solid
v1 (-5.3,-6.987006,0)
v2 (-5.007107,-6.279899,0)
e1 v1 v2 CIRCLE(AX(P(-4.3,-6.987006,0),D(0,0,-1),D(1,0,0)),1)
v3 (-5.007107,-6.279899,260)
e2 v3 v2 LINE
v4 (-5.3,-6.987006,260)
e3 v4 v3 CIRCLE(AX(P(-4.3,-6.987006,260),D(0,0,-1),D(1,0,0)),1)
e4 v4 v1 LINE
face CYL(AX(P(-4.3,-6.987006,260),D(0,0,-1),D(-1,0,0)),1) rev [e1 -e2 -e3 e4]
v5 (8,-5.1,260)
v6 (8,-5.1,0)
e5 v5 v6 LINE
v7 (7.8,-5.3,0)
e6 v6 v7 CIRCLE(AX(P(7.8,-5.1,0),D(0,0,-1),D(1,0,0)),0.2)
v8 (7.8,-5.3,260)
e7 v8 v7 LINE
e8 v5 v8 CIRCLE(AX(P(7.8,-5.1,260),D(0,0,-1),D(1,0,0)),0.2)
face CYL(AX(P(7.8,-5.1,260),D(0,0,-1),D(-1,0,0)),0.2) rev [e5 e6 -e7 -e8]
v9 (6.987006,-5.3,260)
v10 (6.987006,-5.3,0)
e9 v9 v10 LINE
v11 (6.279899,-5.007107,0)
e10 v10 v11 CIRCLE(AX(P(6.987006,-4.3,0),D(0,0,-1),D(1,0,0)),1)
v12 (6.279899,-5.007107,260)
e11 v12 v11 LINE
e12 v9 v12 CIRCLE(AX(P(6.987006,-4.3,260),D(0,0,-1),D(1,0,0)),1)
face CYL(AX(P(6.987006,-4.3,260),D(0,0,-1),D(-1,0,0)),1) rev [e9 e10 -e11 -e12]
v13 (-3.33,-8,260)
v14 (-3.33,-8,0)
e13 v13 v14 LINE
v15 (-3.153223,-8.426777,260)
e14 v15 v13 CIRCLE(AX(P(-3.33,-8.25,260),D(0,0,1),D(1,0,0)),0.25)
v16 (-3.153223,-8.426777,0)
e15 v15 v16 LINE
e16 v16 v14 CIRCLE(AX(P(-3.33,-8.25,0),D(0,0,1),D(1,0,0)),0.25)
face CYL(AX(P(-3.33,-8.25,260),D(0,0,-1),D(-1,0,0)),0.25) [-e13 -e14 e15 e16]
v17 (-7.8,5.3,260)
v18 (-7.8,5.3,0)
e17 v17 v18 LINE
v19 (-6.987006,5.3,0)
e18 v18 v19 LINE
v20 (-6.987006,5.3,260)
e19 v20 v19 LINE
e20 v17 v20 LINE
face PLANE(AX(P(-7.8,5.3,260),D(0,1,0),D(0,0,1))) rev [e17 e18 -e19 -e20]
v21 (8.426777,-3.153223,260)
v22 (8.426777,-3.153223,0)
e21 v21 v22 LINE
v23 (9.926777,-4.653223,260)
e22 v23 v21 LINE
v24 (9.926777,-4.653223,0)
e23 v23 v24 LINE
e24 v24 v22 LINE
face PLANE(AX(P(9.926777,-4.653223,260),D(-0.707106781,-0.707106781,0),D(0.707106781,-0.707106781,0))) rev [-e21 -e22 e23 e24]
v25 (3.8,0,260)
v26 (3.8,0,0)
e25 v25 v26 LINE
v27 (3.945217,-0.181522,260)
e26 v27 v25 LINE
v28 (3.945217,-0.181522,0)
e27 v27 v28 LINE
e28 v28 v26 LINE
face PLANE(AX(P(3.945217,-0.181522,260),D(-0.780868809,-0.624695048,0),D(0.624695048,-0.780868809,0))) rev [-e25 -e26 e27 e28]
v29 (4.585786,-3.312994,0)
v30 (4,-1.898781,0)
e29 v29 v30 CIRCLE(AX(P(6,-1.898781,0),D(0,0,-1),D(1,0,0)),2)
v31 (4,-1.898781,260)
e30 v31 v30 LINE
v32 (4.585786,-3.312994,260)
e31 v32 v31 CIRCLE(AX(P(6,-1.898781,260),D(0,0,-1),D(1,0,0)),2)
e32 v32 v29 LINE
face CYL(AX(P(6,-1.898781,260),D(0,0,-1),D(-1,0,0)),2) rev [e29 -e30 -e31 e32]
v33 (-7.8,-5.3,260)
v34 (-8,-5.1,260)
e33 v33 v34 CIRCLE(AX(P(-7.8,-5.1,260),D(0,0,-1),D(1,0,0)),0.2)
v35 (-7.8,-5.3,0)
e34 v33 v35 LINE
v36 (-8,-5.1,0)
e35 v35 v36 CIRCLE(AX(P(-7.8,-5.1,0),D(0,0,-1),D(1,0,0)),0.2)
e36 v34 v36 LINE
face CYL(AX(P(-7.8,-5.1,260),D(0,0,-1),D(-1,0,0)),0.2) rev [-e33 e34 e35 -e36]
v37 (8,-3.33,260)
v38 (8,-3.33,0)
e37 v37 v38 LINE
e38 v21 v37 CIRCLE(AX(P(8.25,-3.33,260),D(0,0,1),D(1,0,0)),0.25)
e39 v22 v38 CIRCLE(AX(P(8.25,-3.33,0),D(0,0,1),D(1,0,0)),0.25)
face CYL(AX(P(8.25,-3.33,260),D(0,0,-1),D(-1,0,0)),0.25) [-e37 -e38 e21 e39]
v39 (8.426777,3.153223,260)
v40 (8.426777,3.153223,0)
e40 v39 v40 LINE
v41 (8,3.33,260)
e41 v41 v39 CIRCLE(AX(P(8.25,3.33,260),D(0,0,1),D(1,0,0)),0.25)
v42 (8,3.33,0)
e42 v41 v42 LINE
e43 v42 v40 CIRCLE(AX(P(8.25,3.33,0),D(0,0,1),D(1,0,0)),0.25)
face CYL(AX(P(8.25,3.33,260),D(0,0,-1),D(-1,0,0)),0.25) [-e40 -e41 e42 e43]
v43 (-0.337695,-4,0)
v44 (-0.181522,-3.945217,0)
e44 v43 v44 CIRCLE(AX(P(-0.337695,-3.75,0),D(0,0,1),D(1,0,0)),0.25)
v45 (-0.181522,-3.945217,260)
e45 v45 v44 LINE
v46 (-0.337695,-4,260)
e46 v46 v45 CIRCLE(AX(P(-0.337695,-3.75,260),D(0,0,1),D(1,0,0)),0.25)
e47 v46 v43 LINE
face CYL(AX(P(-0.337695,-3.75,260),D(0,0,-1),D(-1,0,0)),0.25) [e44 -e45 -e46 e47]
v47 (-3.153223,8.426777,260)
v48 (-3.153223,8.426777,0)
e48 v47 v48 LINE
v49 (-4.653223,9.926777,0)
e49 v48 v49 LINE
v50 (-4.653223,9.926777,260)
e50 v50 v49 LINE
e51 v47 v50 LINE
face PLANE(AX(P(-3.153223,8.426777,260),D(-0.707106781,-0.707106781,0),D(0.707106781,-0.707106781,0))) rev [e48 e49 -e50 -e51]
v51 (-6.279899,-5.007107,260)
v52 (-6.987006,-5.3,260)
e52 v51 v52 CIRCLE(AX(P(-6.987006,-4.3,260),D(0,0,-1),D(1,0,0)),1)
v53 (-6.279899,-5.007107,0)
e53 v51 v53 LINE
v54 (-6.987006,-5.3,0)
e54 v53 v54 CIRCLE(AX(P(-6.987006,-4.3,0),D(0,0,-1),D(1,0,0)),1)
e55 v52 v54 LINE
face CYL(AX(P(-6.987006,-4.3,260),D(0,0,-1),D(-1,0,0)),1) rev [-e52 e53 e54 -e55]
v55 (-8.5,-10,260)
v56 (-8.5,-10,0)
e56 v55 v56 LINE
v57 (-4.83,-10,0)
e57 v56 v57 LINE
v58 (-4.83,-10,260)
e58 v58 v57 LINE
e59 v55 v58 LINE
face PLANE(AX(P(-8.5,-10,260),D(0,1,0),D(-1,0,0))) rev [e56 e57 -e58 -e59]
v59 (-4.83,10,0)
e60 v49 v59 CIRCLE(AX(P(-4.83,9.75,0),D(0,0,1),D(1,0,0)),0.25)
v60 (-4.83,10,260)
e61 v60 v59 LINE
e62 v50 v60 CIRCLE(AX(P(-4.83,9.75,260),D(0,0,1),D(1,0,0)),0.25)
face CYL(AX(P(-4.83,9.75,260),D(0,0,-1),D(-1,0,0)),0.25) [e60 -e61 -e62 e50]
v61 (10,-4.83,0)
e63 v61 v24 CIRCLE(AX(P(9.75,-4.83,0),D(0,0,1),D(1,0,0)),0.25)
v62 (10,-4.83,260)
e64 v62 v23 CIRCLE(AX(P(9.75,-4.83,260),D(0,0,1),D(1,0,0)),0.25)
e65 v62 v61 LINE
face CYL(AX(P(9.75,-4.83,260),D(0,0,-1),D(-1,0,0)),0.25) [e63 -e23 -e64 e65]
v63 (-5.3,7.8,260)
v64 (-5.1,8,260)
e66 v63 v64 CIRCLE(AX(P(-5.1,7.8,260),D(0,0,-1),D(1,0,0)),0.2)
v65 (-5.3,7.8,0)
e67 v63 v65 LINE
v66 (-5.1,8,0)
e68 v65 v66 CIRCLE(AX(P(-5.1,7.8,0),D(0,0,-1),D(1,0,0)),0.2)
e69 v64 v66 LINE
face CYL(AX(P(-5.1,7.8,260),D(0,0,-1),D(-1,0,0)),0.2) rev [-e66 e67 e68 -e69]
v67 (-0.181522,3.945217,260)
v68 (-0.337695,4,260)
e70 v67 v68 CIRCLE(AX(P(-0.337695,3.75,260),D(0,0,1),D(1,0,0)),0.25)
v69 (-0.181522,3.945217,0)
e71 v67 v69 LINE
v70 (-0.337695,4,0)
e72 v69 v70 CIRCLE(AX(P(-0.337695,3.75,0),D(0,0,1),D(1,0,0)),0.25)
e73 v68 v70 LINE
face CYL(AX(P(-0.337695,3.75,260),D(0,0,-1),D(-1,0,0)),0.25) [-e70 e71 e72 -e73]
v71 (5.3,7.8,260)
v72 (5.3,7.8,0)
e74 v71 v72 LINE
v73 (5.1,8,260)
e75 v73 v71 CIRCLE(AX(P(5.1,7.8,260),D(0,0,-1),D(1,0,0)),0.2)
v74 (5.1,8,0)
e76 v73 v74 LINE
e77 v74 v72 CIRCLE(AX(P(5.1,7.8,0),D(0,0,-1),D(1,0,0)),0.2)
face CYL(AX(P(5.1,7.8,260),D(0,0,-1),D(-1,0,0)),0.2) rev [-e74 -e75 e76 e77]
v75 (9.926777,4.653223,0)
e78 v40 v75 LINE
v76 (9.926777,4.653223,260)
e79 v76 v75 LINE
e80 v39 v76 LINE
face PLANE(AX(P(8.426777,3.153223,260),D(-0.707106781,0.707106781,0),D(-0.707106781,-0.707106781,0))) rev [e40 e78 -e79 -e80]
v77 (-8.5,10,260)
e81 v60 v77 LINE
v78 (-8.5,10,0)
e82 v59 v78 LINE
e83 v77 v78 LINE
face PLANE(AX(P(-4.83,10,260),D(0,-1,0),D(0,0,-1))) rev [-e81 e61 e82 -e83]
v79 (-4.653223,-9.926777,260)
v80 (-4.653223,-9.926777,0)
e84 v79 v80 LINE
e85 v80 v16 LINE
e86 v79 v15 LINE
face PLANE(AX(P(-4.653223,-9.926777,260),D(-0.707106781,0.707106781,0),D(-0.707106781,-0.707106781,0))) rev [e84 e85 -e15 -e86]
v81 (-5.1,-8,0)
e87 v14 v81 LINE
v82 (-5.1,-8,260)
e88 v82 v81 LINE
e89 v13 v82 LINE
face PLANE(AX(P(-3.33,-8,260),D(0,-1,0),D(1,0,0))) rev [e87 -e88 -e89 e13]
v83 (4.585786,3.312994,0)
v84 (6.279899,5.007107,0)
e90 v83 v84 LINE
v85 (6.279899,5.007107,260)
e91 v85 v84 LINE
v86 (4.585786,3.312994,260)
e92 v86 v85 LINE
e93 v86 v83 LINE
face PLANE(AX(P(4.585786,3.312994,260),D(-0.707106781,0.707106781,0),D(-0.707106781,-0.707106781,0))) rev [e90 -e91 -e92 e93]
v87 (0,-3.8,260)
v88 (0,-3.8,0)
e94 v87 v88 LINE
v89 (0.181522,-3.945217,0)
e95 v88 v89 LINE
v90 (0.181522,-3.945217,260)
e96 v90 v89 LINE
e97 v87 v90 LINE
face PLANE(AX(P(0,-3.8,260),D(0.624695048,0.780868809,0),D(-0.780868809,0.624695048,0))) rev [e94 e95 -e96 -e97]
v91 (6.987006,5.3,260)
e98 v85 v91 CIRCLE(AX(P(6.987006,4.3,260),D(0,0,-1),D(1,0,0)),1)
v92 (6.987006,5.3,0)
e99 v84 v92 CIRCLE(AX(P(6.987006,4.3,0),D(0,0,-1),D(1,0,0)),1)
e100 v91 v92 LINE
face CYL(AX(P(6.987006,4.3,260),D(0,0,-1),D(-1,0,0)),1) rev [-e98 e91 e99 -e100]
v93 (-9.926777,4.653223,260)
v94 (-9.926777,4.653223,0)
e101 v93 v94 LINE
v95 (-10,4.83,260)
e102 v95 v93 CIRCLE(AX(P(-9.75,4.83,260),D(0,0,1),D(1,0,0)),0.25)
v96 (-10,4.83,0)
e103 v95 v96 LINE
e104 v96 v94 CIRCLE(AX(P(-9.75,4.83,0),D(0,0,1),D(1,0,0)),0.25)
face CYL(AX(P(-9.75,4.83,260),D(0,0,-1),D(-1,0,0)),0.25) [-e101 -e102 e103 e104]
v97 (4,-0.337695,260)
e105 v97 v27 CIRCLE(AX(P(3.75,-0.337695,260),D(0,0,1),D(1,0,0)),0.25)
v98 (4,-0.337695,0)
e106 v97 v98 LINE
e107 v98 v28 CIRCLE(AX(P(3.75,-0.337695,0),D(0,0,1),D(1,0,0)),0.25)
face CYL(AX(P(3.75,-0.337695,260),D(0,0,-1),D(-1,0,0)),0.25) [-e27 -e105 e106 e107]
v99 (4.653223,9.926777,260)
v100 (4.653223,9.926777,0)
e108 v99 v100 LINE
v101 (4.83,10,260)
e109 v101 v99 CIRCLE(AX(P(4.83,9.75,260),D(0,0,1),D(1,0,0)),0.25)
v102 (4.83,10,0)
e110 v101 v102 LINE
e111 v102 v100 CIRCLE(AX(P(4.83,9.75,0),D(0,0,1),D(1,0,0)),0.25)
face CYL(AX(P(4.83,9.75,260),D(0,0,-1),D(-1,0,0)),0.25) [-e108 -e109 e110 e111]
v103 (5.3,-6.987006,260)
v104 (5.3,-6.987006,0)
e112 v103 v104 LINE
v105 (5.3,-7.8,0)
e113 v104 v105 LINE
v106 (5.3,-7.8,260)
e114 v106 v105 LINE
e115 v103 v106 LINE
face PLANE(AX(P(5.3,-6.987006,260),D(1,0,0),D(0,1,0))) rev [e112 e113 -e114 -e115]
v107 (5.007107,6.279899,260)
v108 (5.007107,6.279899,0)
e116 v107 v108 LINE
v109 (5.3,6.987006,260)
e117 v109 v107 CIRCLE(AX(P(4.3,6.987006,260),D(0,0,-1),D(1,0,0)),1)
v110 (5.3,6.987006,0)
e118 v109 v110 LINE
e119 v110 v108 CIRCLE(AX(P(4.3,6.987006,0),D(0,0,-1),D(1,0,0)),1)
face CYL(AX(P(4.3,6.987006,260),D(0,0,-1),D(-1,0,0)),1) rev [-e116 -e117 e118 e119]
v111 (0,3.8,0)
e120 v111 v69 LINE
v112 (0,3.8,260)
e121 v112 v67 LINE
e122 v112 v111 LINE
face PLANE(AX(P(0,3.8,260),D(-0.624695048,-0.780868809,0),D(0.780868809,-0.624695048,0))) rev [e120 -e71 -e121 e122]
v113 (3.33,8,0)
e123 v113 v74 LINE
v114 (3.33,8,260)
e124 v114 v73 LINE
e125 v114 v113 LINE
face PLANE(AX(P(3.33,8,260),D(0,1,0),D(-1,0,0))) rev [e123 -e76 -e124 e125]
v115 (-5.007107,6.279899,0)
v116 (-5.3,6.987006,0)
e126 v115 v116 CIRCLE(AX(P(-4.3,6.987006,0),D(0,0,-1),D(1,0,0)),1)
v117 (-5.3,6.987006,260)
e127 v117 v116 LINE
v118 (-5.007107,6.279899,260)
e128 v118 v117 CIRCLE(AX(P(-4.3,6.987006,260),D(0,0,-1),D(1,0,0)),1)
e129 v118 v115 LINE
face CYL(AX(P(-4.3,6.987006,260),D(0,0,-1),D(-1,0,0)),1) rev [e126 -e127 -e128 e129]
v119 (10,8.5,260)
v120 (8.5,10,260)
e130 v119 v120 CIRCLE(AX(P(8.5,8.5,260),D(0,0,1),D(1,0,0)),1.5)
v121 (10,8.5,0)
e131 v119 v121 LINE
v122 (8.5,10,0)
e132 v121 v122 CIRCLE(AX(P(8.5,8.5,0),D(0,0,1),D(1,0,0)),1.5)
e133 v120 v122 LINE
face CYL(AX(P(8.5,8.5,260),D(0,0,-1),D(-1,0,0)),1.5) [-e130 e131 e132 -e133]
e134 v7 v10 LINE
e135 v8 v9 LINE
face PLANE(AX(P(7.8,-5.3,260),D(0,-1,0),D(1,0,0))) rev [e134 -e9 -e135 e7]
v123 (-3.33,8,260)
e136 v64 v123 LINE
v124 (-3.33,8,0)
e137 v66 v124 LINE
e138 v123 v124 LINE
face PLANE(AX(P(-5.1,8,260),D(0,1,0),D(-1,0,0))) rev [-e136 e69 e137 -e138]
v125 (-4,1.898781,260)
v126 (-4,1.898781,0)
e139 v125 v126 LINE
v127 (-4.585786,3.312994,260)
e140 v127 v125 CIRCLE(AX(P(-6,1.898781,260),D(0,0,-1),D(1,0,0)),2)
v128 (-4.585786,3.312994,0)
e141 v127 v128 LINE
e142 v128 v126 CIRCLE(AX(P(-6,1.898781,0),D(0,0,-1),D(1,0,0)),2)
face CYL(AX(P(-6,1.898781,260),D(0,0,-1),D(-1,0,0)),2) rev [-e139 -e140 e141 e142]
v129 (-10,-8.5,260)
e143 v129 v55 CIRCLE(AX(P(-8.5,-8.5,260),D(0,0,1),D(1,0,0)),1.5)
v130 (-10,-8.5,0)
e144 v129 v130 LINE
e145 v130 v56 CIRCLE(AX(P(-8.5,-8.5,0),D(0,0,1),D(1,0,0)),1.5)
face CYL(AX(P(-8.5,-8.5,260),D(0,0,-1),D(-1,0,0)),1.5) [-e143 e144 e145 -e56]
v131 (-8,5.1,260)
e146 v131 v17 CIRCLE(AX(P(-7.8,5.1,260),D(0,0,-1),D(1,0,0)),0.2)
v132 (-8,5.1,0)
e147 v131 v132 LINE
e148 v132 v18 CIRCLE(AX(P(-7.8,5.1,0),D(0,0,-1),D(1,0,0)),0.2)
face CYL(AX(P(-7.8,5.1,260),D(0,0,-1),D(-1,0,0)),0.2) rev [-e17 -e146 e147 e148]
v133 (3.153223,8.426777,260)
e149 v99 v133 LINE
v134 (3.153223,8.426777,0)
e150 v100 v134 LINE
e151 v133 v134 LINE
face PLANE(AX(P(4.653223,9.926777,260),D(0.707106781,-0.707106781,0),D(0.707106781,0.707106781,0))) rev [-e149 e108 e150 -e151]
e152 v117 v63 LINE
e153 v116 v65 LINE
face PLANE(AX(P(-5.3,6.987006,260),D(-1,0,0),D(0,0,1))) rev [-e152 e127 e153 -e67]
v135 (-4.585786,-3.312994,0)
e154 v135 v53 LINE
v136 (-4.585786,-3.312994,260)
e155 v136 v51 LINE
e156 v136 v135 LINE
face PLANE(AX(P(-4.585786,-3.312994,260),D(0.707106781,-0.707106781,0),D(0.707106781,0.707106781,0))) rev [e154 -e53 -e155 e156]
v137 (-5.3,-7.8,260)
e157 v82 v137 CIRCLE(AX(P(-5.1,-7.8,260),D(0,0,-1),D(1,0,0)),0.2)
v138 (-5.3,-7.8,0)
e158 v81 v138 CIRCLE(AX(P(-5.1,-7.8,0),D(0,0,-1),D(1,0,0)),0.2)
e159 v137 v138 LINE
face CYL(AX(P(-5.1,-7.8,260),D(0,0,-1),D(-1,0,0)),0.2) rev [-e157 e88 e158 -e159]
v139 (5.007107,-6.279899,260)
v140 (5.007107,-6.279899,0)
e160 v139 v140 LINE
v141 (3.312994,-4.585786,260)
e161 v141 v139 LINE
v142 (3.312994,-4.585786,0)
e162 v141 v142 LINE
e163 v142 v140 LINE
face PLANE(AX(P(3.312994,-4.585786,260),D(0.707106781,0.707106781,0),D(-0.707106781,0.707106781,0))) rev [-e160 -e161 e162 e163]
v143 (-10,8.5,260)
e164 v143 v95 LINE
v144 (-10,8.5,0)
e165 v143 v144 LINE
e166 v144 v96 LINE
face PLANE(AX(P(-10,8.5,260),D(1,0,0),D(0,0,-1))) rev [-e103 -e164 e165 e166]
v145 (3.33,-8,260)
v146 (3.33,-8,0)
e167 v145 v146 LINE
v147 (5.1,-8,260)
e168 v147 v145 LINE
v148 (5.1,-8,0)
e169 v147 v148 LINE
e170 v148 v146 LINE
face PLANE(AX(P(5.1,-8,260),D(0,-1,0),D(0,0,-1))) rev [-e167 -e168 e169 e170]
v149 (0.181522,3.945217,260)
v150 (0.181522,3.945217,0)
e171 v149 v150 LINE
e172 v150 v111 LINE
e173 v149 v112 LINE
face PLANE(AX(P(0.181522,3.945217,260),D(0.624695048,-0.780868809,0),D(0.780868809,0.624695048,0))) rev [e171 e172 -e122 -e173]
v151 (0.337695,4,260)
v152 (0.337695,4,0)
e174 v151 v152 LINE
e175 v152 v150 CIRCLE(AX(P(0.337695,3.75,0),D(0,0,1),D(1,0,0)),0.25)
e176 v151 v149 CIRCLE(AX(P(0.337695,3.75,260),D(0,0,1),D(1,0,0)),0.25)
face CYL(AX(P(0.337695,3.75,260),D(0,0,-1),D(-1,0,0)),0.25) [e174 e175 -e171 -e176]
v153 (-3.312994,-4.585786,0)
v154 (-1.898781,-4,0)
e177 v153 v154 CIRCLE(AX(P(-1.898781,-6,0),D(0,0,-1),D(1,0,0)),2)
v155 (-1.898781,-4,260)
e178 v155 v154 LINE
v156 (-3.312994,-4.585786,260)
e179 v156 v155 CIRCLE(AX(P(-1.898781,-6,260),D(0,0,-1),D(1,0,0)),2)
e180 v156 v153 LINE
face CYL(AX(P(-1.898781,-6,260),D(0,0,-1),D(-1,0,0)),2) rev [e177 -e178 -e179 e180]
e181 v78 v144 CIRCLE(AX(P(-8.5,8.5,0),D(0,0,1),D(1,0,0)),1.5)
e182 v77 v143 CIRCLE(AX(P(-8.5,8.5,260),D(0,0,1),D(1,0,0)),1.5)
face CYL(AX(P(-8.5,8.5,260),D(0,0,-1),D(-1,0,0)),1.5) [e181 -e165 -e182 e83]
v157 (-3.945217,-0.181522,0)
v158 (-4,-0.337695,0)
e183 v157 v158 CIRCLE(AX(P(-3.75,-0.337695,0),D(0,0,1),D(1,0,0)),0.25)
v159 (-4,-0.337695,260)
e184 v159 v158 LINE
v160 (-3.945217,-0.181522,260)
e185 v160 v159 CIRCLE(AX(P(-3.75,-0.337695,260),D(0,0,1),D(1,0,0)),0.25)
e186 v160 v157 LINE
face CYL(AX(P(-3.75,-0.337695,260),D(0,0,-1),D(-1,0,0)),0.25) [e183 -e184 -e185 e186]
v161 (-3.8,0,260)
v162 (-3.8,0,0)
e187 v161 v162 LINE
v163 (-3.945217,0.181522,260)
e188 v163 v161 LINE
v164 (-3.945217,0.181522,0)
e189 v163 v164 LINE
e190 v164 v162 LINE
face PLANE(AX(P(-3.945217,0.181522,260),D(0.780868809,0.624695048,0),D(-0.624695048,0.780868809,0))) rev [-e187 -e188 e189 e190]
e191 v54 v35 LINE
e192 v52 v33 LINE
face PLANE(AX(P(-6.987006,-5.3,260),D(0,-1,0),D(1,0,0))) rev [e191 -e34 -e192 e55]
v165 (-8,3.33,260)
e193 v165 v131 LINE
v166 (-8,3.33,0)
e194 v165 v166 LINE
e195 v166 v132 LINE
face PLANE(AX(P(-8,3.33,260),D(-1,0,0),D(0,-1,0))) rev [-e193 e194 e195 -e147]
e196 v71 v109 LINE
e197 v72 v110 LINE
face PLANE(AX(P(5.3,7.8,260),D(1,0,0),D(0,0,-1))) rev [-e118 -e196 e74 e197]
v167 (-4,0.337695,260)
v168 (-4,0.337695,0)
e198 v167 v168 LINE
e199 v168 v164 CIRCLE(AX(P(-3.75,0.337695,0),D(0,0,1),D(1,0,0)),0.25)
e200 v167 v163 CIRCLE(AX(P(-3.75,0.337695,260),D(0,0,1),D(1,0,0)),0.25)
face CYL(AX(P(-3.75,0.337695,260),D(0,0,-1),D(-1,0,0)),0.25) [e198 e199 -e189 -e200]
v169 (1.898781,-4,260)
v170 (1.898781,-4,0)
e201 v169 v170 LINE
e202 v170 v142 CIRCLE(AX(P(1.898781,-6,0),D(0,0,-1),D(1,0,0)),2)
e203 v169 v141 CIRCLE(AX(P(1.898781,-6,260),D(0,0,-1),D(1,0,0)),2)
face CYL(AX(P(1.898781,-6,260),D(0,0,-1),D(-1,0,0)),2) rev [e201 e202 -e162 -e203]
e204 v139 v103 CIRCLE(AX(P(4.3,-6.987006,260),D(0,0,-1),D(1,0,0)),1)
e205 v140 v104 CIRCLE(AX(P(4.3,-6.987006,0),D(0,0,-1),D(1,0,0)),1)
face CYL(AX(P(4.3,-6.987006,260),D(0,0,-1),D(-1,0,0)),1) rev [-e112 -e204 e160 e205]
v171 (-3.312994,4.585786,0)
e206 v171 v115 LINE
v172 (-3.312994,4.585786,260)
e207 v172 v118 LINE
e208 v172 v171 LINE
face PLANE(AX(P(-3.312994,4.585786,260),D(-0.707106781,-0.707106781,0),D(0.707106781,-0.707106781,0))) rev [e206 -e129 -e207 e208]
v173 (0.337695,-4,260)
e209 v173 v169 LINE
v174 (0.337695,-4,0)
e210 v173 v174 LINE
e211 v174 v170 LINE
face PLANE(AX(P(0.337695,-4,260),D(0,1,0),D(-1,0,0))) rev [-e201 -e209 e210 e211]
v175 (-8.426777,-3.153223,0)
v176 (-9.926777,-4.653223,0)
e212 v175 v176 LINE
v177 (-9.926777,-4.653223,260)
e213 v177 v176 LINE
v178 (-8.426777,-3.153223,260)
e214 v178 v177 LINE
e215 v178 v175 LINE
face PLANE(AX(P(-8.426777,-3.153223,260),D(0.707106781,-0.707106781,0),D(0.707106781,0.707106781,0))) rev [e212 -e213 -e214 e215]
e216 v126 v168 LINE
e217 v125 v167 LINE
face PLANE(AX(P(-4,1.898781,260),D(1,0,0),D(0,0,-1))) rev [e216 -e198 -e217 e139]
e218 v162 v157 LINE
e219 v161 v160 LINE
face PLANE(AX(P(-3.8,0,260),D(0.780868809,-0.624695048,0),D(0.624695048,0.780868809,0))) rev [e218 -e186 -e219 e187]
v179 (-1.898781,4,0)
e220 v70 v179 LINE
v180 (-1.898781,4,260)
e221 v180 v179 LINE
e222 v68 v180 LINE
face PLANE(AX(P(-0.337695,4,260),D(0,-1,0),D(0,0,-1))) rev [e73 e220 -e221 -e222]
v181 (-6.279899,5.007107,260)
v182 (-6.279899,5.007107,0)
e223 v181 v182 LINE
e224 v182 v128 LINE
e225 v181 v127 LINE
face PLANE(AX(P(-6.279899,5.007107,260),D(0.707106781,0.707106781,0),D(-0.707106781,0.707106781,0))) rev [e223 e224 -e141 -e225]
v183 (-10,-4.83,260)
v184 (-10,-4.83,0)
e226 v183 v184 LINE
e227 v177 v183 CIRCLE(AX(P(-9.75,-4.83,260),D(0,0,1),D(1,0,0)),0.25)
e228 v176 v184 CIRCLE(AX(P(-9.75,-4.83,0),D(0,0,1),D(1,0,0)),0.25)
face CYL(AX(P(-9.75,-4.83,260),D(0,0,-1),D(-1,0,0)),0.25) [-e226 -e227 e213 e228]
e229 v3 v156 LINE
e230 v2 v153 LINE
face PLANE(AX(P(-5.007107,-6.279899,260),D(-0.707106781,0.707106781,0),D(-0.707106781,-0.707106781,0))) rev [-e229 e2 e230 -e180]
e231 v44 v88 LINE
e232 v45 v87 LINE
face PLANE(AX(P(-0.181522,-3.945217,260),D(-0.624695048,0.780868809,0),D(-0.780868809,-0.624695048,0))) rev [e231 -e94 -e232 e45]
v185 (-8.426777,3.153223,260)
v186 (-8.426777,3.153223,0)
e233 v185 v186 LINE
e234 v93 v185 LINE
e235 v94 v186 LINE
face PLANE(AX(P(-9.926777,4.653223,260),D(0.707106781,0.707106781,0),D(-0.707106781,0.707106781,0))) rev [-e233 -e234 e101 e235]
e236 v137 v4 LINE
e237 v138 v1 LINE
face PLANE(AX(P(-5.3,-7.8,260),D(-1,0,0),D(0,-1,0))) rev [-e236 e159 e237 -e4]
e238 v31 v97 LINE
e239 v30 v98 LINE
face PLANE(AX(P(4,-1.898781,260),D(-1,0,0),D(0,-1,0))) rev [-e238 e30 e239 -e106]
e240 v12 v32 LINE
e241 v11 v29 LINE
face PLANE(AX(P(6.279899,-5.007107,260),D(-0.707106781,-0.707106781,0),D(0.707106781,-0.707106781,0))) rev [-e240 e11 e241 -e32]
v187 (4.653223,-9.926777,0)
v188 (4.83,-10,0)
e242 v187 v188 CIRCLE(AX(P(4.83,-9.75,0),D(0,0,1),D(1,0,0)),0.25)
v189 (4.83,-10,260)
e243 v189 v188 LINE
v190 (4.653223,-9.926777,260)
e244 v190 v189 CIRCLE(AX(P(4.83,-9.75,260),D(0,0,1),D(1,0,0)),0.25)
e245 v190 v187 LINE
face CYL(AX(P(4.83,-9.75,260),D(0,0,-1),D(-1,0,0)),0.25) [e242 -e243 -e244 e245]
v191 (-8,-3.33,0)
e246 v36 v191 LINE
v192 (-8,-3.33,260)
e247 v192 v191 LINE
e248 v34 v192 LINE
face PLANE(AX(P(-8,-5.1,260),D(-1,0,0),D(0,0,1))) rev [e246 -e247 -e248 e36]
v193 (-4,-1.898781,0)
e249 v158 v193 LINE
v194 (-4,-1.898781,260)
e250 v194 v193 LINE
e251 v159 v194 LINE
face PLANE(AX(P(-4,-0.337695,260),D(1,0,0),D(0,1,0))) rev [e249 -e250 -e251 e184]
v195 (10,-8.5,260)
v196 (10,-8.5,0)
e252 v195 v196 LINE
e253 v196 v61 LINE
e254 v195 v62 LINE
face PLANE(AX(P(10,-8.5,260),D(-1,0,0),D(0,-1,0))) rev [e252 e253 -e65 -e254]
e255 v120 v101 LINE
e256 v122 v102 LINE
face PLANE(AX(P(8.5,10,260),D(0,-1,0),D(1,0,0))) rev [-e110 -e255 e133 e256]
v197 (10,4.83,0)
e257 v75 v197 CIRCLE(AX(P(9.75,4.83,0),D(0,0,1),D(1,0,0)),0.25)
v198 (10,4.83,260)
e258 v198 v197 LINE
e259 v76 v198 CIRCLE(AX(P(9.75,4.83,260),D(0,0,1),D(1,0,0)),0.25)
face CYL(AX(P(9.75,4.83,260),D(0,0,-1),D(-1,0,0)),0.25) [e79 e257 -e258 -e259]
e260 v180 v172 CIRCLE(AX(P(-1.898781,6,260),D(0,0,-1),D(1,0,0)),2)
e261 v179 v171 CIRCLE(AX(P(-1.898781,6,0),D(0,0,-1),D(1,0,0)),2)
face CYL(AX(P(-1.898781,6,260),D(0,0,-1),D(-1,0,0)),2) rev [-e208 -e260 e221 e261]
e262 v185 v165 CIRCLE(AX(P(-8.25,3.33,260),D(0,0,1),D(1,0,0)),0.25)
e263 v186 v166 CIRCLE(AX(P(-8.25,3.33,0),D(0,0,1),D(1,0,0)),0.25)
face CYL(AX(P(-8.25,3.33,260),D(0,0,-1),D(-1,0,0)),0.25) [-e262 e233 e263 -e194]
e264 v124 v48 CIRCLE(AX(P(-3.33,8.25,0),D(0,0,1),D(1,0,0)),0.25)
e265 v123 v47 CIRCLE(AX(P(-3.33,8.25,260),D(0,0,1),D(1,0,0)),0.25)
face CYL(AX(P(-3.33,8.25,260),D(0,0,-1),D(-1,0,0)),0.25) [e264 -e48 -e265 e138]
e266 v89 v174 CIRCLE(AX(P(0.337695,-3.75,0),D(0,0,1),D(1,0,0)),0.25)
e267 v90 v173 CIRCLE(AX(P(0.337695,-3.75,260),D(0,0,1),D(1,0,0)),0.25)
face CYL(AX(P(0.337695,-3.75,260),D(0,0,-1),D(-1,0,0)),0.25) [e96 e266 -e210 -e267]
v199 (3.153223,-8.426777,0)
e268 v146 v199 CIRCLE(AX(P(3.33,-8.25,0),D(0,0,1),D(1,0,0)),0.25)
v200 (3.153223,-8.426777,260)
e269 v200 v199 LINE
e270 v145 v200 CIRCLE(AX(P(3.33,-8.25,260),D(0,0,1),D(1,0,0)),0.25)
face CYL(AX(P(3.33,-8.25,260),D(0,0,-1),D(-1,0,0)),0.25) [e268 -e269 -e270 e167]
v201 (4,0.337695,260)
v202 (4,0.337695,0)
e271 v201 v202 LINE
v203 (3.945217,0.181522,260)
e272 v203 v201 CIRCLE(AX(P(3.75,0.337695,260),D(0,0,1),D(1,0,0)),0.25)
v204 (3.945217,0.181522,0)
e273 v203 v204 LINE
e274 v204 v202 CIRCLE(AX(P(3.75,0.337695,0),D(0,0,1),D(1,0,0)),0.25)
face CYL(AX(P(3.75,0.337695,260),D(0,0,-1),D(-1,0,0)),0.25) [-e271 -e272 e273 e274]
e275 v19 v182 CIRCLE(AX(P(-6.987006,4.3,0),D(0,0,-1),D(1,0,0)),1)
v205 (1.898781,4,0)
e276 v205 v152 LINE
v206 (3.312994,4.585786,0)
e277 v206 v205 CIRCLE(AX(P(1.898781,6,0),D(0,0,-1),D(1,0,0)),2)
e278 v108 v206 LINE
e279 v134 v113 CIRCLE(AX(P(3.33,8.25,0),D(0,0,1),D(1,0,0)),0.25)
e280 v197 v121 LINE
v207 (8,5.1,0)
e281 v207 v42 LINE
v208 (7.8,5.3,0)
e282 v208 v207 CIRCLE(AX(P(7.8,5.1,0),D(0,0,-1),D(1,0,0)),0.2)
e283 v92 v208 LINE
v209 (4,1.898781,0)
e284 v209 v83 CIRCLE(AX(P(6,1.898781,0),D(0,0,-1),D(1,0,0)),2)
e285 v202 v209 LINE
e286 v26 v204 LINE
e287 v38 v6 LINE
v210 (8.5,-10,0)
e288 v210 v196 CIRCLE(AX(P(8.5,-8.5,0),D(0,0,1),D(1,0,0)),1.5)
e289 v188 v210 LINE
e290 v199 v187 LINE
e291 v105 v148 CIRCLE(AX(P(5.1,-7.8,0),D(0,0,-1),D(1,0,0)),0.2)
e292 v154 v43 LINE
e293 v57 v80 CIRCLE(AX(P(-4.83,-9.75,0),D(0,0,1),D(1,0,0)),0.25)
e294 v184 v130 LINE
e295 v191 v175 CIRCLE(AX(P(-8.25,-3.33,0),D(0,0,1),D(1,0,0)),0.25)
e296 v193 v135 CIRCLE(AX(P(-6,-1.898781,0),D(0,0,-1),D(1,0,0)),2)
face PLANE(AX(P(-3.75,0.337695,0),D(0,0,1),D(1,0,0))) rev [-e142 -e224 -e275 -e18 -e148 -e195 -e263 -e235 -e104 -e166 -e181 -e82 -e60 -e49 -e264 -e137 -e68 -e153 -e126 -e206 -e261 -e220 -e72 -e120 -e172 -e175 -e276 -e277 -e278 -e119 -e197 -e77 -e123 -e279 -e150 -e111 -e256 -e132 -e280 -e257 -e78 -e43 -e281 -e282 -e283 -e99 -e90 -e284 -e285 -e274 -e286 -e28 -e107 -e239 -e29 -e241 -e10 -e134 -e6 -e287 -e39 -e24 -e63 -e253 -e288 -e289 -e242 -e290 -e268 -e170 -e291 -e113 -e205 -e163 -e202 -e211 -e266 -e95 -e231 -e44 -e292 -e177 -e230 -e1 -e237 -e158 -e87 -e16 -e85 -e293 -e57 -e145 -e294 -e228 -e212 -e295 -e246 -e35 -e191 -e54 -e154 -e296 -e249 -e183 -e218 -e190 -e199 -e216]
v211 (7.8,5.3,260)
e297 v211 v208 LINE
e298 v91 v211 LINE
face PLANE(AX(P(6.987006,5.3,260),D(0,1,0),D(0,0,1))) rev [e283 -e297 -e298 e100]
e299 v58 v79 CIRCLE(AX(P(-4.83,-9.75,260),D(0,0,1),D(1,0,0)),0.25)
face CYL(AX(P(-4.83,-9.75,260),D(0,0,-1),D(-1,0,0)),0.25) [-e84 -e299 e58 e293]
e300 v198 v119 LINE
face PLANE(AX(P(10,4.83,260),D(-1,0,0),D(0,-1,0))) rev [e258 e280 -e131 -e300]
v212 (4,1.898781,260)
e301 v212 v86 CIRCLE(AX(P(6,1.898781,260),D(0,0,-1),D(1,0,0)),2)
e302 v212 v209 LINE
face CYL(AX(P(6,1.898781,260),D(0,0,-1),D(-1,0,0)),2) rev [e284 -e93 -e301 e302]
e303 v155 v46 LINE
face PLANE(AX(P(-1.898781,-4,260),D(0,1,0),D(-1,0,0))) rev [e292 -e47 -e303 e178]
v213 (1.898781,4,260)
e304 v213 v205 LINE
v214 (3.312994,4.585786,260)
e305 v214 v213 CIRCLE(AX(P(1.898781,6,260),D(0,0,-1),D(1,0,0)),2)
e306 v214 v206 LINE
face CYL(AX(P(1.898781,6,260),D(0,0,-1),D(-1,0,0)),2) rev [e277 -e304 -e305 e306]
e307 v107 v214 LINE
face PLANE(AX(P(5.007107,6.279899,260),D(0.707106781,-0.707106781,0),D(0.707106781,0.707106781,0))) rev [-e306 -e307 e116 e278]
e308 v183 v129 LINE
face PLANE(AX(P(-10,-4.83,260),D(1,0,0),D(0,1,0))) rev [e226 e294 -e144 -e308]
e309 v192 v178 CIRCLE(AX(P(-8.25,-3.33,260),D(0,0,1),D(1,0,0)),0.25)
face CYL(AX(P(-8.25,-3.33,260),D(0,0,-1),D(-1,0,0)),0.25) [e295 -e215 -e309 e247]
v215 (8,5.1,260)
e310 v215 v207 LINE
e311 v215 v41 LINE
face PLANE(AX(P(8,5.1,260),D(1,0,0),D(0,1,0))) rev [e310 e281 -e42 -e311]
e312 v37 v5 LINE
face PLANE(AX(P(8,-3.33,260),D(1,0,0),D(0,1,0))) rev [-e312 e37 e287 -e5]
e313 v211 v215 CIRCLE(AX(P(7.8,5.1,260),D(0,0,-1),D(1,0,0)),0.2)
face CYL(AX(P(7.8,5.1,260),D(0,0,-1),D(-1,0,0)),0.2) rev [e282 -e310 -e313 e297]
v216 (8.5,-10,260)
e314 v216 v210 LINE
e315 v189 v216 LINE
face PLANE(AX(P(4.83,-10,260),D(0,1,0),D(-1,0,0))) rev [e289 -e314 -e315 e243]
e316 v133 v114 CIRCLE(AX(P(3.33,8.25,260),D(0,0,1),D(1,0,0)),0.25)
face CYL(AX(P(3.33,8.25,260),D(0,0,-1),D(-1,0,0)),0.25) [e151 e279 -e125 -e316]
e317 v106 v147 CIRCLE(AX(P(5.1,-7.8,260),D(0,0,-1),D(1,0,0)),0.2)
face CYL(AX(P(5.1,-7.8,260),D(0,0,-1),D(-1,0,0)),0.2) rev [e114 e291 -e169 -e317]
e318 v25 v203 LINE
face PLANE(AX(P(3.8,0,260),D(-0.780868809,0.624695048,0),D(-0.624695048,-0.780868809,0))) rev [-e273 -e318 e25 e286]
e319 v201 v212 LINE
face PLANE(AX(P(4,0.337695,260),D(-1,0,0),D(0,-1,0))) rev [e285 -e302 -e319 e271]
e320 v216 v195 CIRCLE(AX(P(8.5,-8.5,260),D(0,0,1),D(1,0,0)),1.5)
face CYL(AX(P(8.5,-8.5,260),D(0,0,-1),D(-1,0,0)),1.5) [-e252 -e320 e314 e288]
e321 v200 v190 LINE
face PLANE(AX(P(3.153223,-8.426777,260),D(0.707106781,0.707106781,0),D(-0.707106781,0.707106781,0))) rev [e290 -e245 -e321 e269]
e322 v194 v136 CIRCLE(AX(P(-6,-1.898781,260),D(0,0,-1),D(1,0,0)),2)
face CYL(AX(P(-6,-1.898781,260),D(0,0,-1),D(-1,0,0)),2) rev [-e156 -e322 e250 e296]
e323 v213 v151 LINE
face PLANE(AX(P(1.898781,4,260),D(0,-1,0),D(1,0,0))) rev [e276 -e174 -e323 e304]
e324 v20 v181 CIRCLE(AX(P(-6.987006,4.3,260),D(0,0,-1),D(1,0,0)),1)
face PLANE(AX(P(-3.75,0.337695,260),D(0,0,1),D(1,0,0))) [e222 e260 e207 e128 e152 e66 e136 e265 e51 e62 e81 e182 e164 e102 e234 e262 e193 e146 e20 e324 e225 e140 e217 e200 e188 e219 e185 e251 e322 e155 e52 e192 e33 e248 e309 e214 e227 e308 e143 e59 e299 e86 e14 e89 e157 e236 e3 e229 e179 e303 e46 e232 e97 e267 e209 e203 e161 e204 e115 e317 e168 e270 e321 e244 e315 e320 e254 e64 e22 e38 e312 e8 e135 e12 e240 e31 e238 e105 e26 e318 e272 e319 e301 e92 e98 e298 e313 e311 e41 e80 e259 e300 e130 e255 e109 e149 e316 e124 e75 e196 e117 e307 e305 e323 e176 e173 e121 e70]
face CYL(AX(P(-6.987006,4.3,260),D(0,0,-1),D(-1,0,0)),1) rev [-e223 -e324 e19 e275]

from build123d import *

# Parameters (mm, degrees)
EXTRUDE_1_DEPTH = 260


# Read off the part's stored shape, not the designer's step: 222 Конструкционный профиль 20х20-1-surface1
with BuildPart() as part:
    # Эскиз1 → Бобышка-Вытянуть1 (new body)
    with BuildSketch(Plane.XY):
        with BuildLine():
            Line((-3.945217202, 0.181521503), (-3.8, 0))
            Line((-3.8, 0), (-3.945217202, -0.181521503))
            ThreePointArc((-3.945217202, -0.181521503), (-3.98590708, -0.254943529), (-4, -0.337695265))
            Line((-4, -0.337695265), (-4, -1.898780669))
            ThreePointArc((-4, -1.898780669), (-4.152240935, -2.664147534), (-4.585786438, -3.312994231))
            Line((-4.585786438, -3.312994231), (-6.279898987, -5.007106781))
            ThreePointArc((-6.279898987, -5.007106781), (-6.604322336, -5.223879533), (-6.987005769, -5.3))
            Line((-6.987005769, -5.3), (-7.8, -5.3))
            ThreePointArc((-7.8, -5.3), (-7.941421356, -5.241421356), (-8, -5.1))
            Line((-8, -5.1), (-8, -3.33))
            ThreePointArc((-8, -3.33), (-8.154329142, -3.099030117), (-8.426776695, -3.153223305))
            Line((-8.426776695, -3.153223305), (-9.926776695, -4.653223305))
            ThreePointArc((-9.926776695, -4.653223305), (-9.980969883, -4.734329142), (-10, -4.83))
            Line((-10, -4.83), (-10, -8.5))
            ThreePointArc((-10, -8.5), (-9.560660172, -9.560660172), (-8.5, -10))
            Line((-8.5, -10), (-4.83, -10))
            ThreePointArc((-4.83, -10), (-4.734329142, -9.980969883), (-4.653223305, -9.926776695))
            Line((-4.653223305, -9.926776695), (-3.153223305, -8.426776695))
            ThreePointArc((-3.153223305, -8.426776695), (-3.099030117, -8.154329142), (-3.33, -8))
            Line((-3.33, -8), (-5.1, -8))
            ThreePointArc((-5.1, -8), (-5.241421356, -7.941421356), (-5.3, -7.8))
            Line((-5.3, -7.8), (-5.3, -6.987005769))
            ThreePointArc((-5.3, -6.987005769), (-5.223879533, -6.604322336), (-5.007106781, -6.279898987))
            Line((-5.007106781, -6.279898987), (-3.312994231, -4.585786438))
            ThreePointArc((-3.312994231, -4.585786438), (-2.664147534, -4.152240935), (-1.898780669, -4))
            Line((-1.898780669, -4), (-0.337695265, -4))
            ThreePointArc((-0.337695265, -4), (-0.254943529, -3.98590708), (-0.181521503, -3.945217202))
            Line((-0.181521503, -3.945217202), (0, -3.8))
            Line((0, -3.8), (0.181521503, -3.945217202))
            ThreePointArc((0.181521503, -3.945217202), (0.254943529, -3.98590708), (0.337695265, -4))
            Line((0.337695265, -4), (1.898780669, -4))
            ThreePointArc((1.898780669, -4), (2.664147534, -4.152240935), (3.312994231, -4.585786438))
            Line((3.312994231, -4.585786438), (5.007106781, -6.279898987))
            ThreePointArc((5.007106781, -6.279898987), (5.223879533, -6.604322336), (5.3, -6.987005769))
            Line((5.3, -6.987005769), (5.3, -7.8))
            ThreePointArc((5.3, -7.8), (5.241421356, -7.941421356), (5.1, -8))
            Line((5.1, -8), (3.33, -8))
            ThreePointArc((3.33, -8), (3.099030117, -8.154329142), (3.153223305, -8.426776695))
            Line((3.153223305, -8.426776695), (4.653223305, -9.926776695))
            ThreePointArc((4.653223305, -9.926776695), (4.734329142, -9.980969883), (4.83, -10))
            Line((4.83, -10), (8.5, -10))
            ThreePointArc((8.5, -10), (9.560660172, -9.560660172), (10, -8.5))
            Line((10, -8.5), (10, -4.83))
            ThreePointArc((10, -4.83), (9.980969883, -4.734329142), (9.926776695, -4.653223305))
            Line((9.926776695, -4.653223305), (8.426776695, -3.153223305))
            ThreePointArc((8.426776695, -3.153223305), (8.154329142, -3.099030117), (8, -3.33))
            Line((8, -3.33), (8, -5.1))
            ThreePointArc((8, -5.1), (7.941421356, -5.241421356), (7.8, -5.3))
            Line((7.8, -5.3), (6.987005769, -5.3))
            ThreePointArc((6.987005769, -5.3), (6.604322336, -5.223879533), (6.279898987, -5.007106781))
            Line((6.279898987, -5.007106781), (4.585786438, -3.312994231))
            ThreePointArc((4.585786438, -3.312994231), (4.152240935, -2.664147534), (4, -1.898780669))
            Line((4, -1.898780669), (4, -0.337695265))
            ThreePointArc((4, -0.337695265), (3.98590708, -0.254943529), (3.945217202, -0.181521503))
            Line((3.945217202, -0.181521503), (3.8, 0))
            Line((3.8, 0), (3.945217202, 0.181521503))
            ThreePointArc((3.945217202, 0.181521503), (3.98590708, 0.254943529), (4, 0.337695265))
            Line((4, 0.337695265), (4, 1.898780669))
            ThreePointArc((4, 1.898780669), (4.152240935, 2.664147534), (4.585786438, 3.312994231))
            Line((4.585786438, 3.312994231), (6.279898987, 5.007106781))
            ThreePointArc((6.279898987, 5.007106781), (6.604322336, 5.223879533), (6.987005769, 5.3))
            Line((6.987005769, 5.3), (7.8, 5.3))
            ThreePointArc((7.8, 5.3), (7.941421356, 5.241421356), (8, 5.1))
            Line((8, 5.1), (8, 3.33))
            ThreePointArc((8, 3.33), (8.154329142, 3.099030117), (8.426776695, 3.153223305))
            Line((8.426776695, 3.153223305), (9.926776695, 4.653223305))
            ThreePointArc((9.926776695, 4.653223305), (9.980969883, 4.734329142), (10, 4.83))
            Line((10, 4.83), (10, 8.5))
            ThreePointArc((10, 8.5), (9.560660172, 9.560660172), (8.5, 10))
            Line((8.5, 10), (4.83, 10))
            ThreePointArc((4.83, 10), (4.734329142, 9.980969883), (4.653223305, 9.926776695))
            Line((4.653223305, 9.926776695), (3.153223305, 8.426776695))
            ThreePointArc((3.153223305, 8.426776695), (3.099030117, 8.154329142), (3.33, 8))
            Line((3.33, 8), (5.1, 8))
            ThreePointArc((5.1, 8), (5.241421356, 7.941421356), (5.3, 7.8))
            Line((5.3, 7.8), (5.3, 6.987005769))
            ThreePointArc((5.3, 6.987005769), (5.223879533, 6.604322336), (5.007106781, 6.279898987))
            Line((5.007106781, 6.279898987), (3.312994231, 4.585786438))
            ThreePointArc((3.312994231, 4.585786438), (2.664147534, 4.152240935), (1.898780669, 4))
            Line((1.898780669, 4), (0.337695265, 4))
            ThreePointArc((0.337695265, 4), (0.254943529, 3.98590708), (0.181521503, 3.945217202))
            Line((0.181521503, 3.945217202), (0, 3.8))
            Line((0, 3.8), (-0.181521503, 3.945217202))
            ThreePointArc((-0.181521503, 3.945217202), (-0.254943529, 3.98590708), (-0.337695265, 4))
            Line((-0.337695265, 4), (-1.898780669, 4))
            ThreePointArc((-1.898780669, 4), (-2.664147534, 4.152240935), (-3.312994231, 4.585786438))
            Line((-3.312994231, 4.585786438), (-5.007106781, 6.279898987))
            ThreePointArc((-5.007106781, 6.279898987), (-5.223879533, 6.604322336), (-5.3, 6.987005769))
            Line((-5.3, 6.987005769), (-5.3, 7.8))
            ThreePointArc((-5.3, 7.8), (-5.241421356, 7.941421356), (-5.1, 8))
            Line((-5.1, 8), (-3.33, 8))
            ThreePointArc((-3.33, 8), (-3.099030117, 8.154329142), (-3.153223305, 8.426776695))
            Line((-3.153223305, 8.426776695), (-4.653223305, 9.926776695))
            ThreePointArc((-4.653223305, 9.926776695), (-4.734329142, 9.980969883), (-4.83, 10))
            Line((-4.83, 10), (-8.5, 10))
            ThreePointArc((-8.5, 10), (-9.560660172, 9.560660172), (-10, 8.5))
            Line((-10, 8.5), (-10, 4.83))
            ThreePointArc((-10, 4.83), (-9.980969883, 4.734329142), (-9.926776695, 4.653223305))
            Line((-9.926776695, 4.653223305), (-8.426776695, 3.153223305))
            ThreePointArc((-8.426776695, 3.153223305), (-8.154329142, 3.099030117), (-8, 3.33))
            Line((-8, 3.33), (-8, 5.1))
            ThreePointArc((-8, 5.1), (-7.941421356, 5.241421356), (-7.8, 5.3))
            Line((-7.8, 5.3), (-6.987005769, 5.3))
            ThreePointArc((-6.987005769, 5.3), (-6.604322336, 5.223879533), (-6.279898987, 5.007106781))
            Line((-6.279898987, 5.007106781), (-4.585786438, 3.312994231))
            ThreePointArc((-4.585786438, 3.312994231), (-4.152240935, 2.664147534), (-4, 1.898780669))
            Line((-4, 1.898780669), (-4, 0.337695265))
            ThreePointArc((-4, 0.337695265), (-3.98590708, 0.254943529), (-3.945217202, 0.181521503))
        make_face()
    extrude(amount=EXTRUDE_1_DEPTH)


solid = part.part
